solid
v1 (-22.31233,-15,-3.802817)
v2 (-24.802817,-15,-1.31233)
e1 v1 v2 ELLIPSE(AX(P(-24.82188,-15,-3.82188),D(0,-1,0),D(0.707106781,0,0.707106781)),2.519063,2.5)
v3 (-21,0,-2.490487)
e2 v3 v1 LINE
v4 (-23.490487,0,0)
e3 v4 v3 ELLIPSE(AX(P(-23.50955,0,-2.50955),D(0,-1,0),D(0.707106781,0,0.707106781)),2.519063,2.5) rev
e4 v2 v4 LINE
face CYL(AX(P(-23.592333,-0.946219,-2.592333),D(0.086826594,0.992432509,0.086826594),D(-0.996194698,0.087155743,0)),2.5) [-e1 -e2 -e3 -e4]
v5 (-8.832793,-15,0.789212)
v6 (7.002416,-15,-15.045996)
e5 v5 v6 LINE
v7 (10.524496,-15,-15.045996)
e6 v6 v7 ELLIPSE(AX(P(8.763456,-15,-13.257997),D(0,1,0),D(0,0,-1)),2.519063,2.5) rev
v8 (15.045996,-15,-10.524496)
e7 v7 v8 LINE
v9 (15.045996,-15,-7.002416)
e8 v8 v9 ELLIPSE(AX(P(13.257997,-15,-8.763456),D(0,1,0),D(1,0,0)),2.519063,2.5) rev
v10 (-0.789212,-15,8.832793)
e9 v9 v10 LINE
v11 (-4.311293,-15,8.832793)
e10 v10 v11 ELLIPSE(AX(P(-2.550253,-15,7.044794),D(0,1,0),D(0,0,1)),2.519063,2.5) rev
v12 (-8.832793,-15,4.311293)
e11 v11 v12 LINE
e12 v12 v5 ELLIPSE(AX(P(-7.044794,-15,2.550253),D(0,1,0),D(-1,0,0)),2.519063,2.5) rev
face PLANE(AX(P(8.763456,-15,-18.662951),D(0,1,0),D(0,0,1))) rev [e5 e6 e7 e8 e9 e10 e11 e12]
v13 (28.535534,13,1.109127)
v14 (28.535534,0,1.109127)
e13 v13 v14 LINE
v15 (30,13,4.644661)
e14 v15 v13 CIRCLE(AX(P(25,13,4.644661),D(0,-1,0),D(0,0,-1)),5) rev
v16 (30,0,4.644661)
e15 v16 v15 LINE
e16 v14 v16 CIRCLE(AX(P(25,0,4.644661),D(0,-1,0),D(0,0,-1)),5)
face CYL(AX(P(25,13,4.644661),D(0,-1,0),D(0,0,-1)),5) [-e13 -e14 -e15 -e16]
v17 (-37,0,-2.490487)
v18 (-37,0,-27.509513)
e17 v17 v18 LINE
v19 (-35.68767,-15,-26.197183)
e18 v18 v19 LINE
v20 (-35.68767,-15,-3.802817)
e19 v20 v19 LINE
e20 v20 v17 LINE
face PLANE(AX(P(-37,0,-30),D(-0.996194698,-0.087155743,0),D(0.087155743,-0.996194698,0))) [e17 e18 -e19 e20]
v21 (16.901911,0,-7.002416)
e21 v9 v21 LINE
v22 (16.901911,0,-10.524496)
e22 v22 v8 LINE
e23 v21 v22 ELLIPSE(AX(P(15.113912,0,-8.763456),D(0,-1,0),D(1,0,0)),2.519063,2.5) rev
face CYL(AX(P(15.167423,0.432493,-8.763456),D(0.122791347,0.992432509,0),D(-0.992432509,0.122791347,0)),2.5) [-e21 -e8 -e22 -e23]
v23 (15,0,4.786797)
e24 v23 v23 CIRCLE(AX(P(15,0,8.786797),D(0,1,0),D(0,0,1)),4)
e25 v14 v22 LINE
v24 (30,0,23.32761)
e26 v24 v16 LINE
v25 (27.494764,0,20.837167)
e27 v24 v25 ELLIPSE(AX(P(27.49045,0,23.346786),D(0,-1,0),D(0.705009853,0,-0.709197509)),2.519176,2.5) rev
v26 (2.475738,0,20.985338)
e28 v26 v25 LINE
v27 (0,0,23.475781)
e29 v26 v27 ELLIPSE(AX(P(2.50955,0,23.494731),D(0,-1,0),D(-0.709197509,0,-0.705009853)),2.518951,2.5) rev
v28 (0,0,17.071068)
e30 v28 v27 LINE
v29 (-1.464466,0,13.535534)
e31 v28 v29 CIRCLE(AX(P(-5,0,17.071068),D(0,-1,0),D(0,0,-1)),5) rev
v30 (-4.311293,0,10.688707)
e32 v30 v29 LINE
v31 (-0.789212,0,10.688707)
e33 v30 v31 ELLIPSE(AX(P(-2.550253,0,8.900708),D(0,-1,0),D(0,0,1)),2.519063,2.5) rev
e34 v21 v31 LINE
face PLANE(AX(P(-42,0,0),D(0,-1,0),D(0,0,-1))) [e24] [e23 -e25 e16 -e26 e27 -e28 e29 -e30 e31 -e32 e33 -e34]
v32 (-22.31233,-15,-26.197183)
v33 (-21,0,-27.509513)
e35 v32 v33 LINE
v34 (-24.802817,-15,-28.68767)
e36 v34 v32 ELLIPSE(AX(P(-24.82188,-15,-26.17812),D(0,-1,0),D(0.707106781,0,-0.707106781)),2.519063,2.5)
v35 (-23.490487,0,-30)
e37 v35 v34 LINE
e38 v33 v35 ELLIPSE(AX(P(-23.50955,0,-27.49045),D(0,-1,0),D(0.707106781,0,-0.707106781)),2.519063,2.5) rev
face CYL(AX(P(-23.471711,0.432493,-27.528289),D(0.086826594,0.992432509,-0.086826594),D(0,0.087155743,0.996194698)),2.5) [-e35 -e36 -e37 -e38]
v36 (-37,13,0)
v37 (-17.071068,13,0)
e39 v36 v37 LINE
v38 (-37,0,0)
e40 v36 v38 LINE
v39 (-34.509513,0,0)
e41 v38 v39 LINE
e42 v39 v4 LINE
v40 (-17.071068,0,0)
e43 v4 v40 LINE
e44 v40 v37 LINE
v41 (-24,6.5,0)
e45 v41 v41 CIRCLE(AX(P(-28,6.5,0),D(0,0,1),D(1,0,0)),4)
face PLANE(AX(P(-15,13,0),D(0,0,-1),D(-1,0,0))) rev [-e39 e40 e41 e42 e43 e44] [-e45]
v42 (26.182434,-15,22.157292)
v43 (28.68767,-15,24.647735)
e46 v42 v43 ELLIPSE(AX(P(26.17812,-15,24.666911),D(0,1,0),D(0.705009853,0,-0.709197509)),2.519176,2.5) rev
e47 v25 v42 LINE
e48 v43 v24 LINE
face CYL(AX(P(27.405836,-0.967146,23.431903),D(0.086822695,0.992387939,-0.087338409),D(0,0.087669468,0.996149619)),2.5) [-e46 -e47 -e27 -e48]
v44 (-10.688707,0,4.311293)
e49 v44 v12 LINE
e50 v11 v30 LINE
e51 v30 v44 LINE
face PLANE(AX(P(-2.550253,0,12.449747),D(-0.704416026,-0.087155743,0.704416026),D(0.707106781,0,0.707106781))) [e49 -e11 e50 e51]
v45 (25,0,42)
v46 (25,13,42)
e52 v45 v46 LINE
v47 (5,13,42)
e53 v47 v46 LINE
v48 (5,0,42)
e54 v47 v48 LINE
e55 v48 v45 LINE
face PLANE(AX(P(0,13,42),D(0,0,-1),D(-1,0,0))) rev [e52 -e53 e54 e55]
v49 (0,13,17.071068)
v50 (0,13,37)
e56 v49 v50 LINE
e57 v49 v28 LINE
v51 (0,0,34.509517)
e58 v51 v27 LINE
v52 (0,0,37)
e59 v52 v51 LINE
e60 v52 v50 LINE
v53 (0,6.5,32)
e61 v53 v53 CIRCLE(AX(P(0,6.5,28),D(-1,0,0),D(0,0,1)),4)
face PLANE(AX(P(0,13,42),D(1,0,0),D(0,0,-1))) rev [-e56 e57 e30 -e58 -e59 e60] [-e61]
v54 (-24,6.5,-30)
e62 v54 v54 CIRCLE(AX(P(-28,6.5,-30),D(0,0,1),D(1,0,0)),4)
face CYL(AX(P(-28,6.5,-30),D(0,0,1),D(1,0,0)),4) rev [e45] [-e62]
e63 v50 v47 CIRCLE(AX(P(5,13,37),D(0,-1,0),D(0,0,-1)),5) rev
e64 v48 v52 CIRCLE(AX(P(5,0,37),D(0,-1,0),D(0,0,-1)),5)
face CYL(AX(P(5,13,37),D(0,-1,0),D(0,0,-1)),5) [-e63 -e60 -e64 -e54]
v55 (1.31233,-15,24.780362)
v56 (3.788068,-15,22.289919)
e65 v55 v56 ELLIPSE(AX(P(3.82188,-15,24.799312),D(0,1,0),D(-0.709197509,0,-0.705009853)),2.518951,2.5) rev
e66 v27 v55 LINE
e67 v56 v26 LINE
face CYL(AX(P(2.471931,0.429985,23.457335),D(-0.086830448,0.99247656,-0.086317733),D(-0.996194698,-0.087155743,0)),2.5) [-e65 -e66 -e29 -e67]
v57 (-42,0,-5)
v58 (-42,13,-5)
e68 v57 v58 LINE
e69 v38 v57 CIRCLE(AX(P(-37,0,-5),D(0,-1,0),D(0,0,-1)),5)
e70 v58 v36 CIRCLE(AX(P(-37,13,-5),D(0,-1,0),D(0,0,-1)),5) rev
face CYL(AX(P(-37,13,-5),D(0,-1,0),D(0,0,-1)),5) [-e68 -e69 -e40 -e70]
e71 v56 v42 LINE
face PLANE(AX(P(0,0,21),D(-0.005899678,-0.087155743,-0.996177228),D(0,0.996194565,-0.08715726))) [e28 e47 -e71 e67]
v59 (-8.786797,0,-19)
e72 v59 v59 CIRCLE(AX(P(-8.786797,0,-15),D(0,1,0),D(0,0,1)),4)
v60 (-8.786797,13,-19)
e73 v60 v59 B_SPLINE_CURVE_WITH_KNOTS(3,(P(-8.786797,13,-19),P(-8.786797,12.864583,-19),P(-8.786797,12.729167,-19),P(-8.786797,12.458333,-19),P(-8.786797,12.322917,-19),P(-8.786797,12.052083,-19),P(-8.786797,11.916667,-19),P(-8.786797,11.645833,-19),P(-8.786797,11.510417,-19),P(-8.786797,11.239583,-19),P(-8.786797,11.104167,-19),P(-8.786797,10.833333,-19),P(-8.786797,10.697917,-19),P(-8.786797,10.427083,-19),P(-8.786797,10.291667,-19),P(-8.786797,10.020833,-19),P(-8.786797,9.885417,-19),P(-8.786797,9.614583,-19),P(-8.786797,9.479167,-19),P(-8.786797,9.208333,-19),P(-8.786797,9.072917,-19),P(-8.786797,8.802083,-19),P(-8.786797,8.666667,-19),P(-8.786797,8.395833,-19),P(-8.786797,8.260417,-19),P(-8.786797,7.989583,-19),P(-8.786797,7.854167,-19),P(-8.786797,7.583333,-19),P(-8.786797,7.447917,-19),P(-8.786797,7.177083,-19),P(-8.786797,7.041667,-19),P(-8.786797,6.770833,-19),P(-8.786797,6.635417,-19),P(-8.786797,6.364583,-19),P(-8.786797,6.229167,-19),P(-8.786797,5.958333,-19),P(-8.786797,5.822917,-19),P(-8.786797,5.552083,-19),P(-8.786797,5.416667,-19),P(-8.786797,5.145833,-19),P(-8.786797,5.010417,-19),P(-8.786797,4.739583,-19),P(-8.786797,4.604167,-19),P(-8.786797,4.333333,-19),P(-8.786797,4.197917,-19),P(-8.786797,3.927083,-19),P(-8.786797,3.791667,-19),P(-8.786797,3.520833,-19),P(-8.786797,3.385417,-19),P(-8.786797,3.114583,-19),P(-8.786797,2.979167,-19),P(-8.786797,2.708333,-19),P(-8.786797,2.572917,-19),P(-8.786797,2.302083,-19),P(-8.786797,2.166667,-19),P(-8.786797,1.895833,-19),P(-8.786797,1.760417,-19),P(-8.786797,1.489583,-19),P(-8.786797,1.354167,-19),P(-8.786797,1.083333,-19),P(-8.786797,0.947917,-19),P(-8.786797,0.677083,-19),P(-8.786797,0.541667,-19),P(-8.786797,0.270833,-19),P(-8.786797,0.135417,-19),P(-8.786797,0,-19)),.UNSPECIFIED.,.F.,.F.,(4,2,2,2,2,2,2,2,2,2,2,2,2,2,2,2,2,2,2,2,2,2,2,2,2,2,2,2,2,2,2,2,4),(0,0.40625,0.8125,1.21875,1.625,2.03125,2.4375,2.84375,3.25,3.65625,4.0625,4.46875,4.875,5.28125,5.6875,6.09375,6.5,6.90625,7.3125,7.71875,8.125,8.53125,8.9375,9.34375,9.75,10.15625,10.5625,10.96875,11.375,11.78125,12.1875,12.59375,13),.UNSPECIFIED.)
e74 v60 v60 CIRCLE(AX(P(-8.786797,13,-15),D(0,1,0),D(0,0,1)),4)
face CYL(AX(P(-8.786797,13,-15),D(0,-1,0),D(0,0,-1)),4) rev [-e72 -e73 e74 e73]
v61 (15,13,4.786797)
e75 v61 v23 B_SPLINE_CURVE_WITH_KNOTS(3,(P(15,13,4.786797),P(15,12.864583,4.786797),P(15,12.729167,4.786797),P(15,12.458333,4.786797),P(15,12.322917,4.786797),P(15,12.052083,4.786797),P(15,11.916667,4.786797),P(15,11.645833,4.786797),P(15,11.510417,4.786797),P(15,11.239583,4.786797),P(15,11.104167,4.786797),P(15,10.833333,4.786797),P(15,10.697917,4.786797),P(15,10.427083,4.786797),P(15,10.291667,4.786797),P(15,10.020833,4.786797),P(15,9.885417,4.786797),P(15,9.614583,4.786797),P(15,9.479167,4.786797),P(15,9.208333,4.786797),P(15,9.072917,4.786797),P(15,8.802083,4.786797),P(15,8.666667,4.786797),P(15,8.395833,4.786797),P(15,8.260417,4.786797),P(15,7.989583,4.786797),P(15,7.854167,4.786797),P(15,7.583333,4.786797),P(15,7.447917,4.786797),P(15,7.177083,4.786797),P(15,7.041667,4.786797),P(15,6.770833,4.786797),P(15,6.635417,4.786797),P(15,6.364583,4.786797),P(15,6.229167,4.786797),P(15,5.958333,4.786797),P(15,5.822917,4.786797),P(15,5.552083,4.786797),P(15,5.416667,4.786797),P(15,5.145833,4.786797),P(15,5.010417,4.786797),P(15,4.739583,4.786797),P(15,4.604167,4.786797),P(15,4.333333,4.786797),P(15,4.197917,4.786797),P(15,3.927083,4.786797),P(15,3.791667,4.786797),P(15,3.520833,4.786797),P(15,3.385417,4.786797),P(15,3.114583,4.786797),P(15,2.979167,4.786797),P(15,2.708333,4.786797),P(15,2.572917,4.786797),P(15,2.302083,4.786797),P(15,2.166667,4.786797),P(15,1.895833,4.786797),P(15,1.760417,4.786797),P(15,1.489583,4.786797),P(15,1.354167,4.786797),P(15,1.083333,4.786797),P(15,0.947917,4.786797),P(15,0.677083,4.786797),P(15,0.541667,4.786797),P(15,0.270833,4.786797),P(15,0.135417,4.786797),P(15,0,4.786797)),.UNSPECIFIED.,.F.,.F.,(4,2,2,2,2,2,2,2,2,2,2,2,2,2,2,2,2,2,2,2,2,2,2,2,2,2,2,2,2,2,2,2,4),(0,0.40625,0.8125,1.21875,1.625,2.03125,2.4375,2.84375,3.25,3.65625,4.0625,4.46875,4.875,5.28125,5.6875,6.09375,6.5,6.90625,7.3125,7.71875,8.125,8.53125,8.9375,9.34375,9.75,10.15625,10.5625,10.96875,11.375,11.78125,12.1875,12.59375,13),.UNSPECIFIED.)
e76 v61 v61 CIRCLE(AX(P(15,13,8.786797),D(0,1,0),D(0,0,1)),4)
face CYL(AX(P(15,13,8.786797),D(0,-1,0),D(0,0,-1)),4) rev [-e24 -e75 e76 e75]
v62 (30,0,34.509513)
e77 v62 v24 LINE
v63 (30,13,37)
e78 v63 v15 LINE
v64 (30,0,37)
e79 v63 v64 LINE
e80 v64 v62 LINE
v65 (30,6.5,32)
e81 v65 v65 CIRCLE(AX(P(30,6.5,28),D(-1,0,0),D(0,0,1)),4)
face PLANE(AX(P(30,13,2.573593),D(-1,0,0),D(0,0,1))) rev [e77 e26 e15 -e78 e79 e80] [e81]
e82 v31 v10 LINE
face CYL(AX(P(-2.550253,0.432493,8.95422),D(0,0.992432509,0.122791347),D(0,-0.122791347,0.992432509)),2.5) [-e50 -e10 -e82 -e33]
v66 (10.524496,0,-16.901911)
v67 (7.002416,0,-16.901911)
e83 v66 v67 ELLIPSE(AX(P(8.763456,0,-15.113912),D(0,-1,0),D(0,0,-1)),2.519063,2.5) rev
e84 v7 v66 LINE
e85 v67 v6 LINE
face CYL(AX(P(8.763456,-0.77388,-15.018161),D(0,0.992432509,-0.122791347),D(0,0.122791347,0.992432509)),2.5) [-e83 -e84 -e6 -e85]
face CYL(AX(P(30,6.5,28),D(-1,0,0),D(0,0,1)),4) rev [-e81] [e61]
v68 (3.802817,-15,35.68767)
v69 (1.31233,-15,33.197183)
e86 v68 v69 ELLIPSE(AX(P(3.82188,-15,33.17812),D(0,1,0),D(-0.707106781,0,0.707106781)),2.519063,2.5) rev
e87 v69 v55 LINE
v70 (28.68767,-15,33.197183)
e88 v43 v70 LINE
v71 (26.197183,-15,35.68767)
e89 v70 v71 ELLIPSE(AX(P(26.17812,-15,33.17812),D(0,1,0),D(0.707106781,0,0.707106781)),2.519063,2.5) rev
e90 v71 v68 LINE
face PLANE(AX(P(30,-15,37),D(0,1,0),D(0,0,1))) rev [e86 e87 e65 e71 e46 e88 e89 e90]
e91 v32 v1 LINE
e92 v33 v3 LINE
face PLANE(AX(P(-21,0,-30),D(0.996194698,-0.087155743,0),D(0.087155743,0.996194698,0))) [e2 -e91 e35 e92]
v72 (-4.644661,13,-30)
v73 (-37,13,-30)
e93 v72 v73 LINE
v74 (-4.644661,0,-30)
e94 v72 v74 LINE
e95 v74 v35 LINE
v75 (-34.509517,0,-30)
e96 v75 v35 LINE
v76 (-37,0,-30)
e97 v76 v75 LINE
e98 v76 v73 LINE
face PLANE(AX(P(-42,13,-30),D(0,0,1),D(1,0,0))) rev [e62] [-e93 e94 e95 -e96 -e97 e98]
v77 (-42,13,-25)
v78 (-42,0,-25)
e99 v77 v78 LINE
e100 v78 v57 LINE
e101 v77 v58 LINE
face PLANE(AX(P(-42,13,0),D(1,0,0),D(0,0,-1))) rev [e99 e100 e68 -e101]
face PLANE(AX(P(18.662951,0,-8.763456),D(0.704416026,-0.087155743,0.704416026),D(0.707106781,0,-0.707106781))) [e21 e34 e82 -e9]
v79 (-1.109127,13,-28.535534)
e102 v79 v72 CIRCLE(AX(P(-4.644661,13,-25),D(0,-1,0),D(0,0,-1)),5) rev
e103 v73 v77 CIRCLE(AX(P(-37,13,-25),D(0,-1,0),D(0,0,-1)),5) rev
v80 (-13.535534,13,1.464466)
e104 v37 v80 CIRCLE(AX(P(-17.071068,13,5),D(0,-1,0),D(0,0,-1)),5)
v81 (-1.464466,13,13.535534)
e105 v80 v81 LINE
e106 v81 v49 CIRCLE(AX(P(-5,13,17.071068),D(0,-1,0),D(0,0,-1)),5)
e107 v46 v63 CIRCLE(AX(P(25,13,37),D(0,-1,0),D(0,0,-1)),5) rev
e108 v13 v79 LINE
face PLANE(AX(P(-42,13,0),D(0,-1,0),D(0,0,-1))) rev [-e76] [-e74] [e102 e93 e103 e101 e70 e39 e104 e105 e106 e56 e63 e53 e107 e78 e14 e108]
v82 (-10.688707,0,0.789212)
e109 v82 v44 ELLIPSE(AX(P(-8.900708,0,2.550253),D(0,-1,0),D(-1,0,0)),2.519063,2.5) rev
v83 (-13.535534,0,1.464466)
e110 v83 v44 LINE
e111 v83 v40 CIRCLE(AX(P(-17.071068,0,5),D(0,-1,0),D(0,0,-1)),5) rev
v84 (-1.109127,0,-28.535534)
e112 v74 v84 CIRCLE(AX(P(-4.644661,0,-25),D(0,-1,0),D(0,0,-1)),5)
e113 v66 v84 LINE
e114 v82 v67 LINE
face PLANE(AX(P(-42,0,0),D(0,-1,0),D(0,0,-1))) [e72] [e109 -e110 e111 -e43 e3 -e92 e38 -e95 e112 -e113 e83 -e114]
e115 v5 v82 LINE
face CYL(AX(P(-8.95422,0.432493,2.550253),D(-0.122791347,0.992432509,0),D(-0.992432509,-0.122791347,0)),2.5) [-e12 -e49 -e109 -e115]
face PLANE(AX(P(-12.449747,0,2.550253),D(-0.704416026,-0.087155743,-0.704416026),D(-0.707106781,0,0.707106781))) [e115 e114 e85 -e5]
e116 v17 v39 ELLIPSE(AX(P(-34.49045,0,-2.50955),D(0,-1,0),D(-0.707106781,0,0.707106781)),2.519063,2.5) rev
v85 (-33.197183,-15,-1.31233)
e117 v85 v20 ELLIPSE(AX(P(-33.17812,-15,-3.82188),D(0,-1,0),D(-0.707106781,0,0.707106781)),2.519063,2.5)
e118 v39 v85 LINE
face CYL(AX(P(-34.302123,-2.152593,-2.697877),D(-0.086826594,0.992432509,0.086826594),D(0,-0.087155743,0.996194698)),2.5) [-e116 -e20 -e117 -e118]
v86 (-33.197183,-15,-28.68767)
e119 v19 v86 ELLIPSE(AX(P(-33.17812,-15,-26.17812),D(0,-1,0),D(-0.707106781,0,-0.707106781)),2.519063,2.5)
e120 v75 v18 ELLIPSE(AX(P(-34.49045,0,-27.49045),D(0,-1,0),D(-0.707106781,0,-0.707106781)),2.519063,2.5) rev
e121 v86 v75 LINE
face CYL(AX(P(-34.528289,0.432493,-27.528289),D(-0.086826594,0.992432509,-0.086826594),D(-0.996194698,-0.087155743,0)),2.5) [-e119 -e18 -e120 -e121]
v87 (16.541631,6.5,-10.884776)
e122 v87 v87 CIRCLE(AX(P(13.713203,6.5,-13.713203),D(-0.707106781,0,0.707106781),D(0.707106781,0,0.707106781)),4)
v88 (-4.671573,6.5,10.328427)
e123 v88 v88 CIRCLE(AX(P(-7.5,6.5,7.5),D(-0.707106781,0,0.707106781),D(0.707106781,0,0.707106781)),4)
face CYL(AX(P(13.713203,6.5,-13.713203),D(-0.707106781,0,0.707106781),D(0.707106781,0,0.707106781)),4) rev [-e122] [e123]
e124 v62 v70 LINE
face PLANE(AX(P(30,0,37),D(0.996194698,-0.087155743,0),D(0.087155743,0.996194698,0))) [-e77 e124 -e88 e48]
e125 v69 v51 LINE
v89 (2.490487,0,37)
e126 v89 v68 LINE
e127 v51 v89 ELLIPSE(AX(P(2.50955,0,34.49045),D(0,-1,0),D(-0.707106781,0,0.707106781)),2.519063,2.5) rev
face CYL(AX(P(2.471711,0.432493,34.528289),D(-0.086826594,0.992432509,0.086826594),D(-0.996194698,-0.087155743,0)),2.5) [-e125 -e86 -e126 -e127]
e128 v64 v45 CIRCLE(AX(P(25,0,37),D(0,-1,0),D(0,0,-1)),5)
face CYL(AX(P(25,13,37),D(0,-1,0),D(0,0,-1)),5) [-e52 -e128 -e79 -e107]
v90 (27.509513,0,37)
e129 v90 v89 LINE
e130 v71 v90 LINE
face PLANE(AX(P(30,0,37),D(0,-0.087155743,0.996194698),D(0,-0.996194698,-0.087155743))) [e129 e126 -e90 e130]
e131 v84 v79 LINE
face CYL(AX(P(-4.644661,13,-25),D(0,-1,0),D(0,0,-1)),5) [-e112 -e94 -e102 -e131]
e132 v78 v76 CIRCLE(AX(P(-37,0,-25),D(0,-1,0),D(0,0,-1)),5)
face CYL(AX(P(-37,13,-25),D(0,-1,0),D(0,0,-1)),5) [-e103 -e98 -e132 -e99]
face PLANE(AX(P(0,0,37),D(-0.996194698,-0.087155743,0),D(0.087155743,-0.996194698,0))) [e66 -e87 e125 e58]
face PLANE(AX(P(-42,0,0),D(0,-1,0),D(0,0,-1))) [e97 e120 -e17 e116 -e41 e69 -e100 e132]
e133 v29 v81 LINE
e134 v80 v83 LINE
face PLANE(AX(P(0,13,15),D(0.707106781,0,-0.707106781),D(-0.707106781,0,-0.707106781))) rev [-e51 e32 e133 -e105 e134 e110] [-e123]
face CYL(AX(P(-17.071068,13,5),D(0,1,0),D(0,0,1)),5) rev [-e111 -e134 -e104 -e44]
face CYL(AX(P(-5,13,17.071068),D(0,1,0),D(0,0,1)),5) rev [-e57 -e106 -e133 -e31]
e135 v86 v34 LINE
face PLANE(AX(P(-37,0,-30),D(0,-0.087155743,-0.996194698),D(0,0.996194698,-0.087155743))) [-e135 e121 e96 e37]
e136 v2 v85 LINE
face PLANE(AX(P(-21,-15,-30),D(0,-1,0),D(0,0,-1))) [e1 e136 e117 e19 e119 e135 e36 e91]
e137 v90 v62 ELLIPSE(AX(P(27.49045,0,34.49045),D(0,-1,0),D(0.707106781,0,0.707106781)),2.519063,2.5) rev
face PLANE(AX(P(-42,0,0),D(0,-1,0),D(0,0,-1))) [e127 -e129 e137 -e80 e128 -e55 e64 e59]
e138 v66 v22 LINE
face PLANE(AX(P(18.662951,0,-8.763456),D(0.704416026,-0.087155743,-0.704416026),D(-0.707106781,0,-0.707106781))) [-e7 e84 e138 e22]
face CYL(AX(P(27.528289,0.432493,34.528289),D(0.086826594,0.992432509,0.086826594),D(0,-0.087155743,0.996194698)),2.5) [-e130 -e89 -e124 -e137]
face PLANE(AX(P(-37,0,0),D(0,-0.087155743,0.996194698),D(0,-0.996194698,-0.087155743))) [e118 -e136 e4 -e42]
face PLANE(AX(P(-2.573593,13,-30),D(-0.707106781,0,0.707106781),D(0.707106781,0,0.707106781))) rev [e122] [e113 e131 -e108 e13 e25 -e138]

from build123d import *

# Parameters (mm, degrees)
SKETCH1_R                = 4
EXTRUDE1_DEPTH           = 13
FILLET5_R                = 5
SKETCH5_R                = 4
EXTRUDE5_DEPTH           = 30
SKETCH6_R                = 4
EXTRUDE6_DEPTH           = 30
SKETCH8_R                = 4
EXTRUDE7_DEPTH           = 30
SKETCH9_W                = 16
SKETCH9_H                = 30
EXTRUDE8_DEPTH           = 15
EXTRUDE8_DRAFT           = 5
EXTRUDE8_PROFILE_2_DEPTH = 15
EXTRUDE8_PROFILE_2_DRAFT = 5
EXTRUDE8_PROFILE_3_DEPTH = 15
EXTRUDE8_PROFILE_3_DRAFT = 5
FILLET8_R                = 2.5


with BuildPart() as part:
    # Sketch1 → Extrude1 (new body)
    with BuildSketch(Plane(origin=(0, 0, 0), x_dir=(1, 0, 0), z_dir=(0, 1, 0))):
        Polygon((0, -15), (-15, 0), (-42, 0), (-42, 30), (-2.573593129, 30), (30, -2.573593129), (30, -42), (0, -42), align=None)
        with Locations(Location((-8.786796564, 15, 0), (0, 0, 90))):
            Circle(SKETCH1_R, mode=Mode.SUBTRACT)
        with Locations(Location((15, -8.786796564, 0), (0, 0, 90))):
            Circle(SKETCH1_R, mode=Mode.SUBTRACT)
    extrude(amount=EXTRUDE1_DEPTH)

    # Fillet5
    fillet5_edges = [part.edges().sort_by_distance(p)[0] for p in [
        (-42, 6.5, 0),
        (-42, 6.5, -30),
        (-2.573593129, 6.5, -30),
        (30, 6.5, 2.573593129),
        (30, 6.5, 42),
        (0, 6.5, 42),
        (0, 6.5, 15),
        (-15, 6.5, 0),
    ]]
    fillet(fillet5_edges, radius=FILLET5_R)

    # Sketch5 → Extrude5 (cut)
    with BuildSketch(Plane(origin=(-7.5, 0, 7.5), x_dir=(0.7071067811865476, 0, 0.7071067811865476), z_dir=(-0.7071067811865476, 0, 0.7071067811865476))):
        with Locations((0, 6.5)):
            Circle(SKETCH5_R)
    extrude(amount=-EXTRUDE5_DEPTH, mode=Mode.SUBTRACT)

    # Sketch6 → Extrude6 (cut)
    with BuildSketch(Plane.XY):
        with Locations((-28, 6.5)):
            Circle(SKETCH6_R)
    extrude(amount=-EXTRUDE6_DEPTH, mode=Mode.SUBTRACT)

    # Sketch8 → Extrude7 (cut)
    with BuildSketch(Plane.ZY):
        with Locations((28, 6.5)):
            Circle(SKETCH8_R)
    extrude(amount=-EXTRUDE7_DEPTH, mode=Mode.SUBTRACT)


with BuildPart() as extrude8_tool:
    # Sketch9 → Extrude8 (with draft: the straight prism first)
    with BuildSketch(Plane.XZ):
        with Locations((-29, -15)):
            Rectangle(SKETCH9_W, SKETCH9_H)
    extrude(amount=EXTRUDE8_DEPTH)
    # Extrude8: the draft: its side faces are tilted about the plane it starts from
    extrude8_sides = [extrude8_tool.faces().sort_by_distance(p)[0] for p in [
        (-29, -7.5, -30),
        (-21, -7.5, -15),
        (-29, -7.5, 0),
        (-37, -7.5, -15),
    ]]
    draft(extrude8_sides, Plane.XZ, EXTRUDE8_DRAFT)


with BuildPart() as part_1:
    add(part.part)

    # Extrude8: add extrude8_tool
    add(extrude8_tool.part)


with BuildPart() as extrude8_profile_2_tool:
    # Sketch9 → Extrude8 profile 2 (with draft: the straight prism first)
    with BuildSketch(Plane.XZ):
        Polygon((18.662950904, -8.763455967), (-2.550252532, 12.449747468), (-12.449747468, 2.550252532), (8.763455967, -18.662950904), align=None)
    extrude(amount=EXTRUDE8_PROFILE_2_DEPTH)
    # Extrude8 profile 2: the draft: its side faces are tilted about the plane it starts from
    extrude8_profile_2_sides = [extrude8_profile_2_tool.faces().sort_by_distance(p)[0] for p in [
        (8.056349186, -7.5, 1.843145751),
        (-7.5, -7.5, 7.5),
        (-1.843145751, -7.5, -8.056349186),
        (13.713203436, -7.5, -13.713203436),
    ]]
    draft(extrude8_profile_2_sides, Plane.XZ, EXTRUDE8_PROFILE_2_DRAFT)


with BuildPart() as part_2:
    add(part_1.part)

    # Extrude8 profile 2: add extrude8_profile_2_tool
    add(extrude8_profile_2_tool.part)


with BuildPart() as extrude8_profile_3_tool:
    # Sketch9 → Extrude8 profile 3 (with draft: the straight prism first)
    with BuildSketch(Plane.XZ):
        Polygon((30, 37), (0, 37), (0, 21), (30, 20.82233047), align=None)
    extrude(amount=EXTRUDE8_PROFILE_3_DEPTH)
    # Extrude8 profile 3: the draft: its side faces are tilted about the plane it starts from
    extrude8_profile_3_sides = [extrude8_profile_3_tool.faces().sort_by_distance(p)[0] for p in [
        (15, -7.5, 37),
        (0, -7.5, 29),
        (15, -7.5, 20.911165235),
        (30, -7.5, 28.911165235),
    ]]
    draft(extrude8_profile_3_sides, Plane.XZ, EXTRUDE8_PROFILE_3_DRAFT)


with BuildPart() as part_3:
    add(part_2.part)

    # Extrude8 profile 3: add extrude8_profile_3_tool
    add(extrude8_profile_3_tool.part)

    # Fillet8
    # the kernel refuses this fillet: 2.5 mm, written as the material it takes off along each edge
    with BuildSketch(Plane(origin=(-13.211385745, 6.155764282, 2.550252532), x_dir=(0.6990853645605914, 0.08649619246092898, 0.7097873355780214), z_dir=(0.12279134661747972, -0.9924325091389671, 0))) as fillet8_piece_1_section:
        with BuildLine():
            CenterArc((FILLET8_R * 0.992432509139, -FILLET8_R), FILLET8_R, 90, 89.564769998)
            Line((-FILLET8_R * 0.00753863989878, -FILLET8_R * 0.992403876506), (0, 0))
            Line((0, 0), (FILLET8_R * 0.992432509139, 0))
        make_face()
    fillet8_piece_1 = extrude(amount=27.519784281, mode=Mode.PRIVATE)
    fillet8_piece_1 = split(fillet8_piece_1, bisect_by=Plane(origin=(-10.350961521, 0, 2.550252532), z_dir=(0, -1, 0)), keep=Keep.TOP, mode=Mode.PRIVATE)
    add(fillet8_piece_1, mode=Mode.SUBTRACT)
    with BuildSketch(Plane(origin=(-2.550252532, 6.155764282, 13.211385745), x_dir=(-0.7097873355780224, 0.08649619246092884, -0.6990853645605904), z_dir=(0, -0.9924325091389671, -0.12279134661747967))) as fillet8_piece_2_section:
        with BuildLine():
            CenterArc((FILLET8_R * 0.992432509139, FILLET8_R), FILLET8_R, 180.435230002, 89.564769998)
            Line((-FILLET8_R * 0.00753863989878, FILLET8_R * 0.992403876506), (0, 0))
            Line((0, 0), (FILLET8_R * 0.992432509139, 0))
        make_face()
    fillet8_piece_2 = extrude(amount=27.519784281, mode=Mode.PRIVATE)
    fillet8_piece_2 = split(fillet8_piece_2, bisect_by=Plane(origin=(-2.550252532, 0, 10.350961521), z_dir=(0, -1, 0)), keep=Keep.TOP, mode=Mode.PRIVATE)
    add(fillet8_piece_2, mode=Mode.SUBTRACT)
    with BuildSketch(Plane(origin=(-0.535427042, 6.119959098, 20.467734537), x_dir=(0.9962056349623634, 0.08598926801855533, -0.01342306428755091), z_dir=(0.0868304478214788, -0.9924765600716912, 0.08631773305285761))) as fillet8_piece_3_section:
        with BuildLine():
            CenterArc((FILLET8_R * 0.98661620345, FILLET8_R), FILLET8_R, 180.77198953, 89.22801047)
            Line((-FILLET8_R * 0.0132930268312, FILLET8_R * 0.986526648575), (0, 0))
            Line((0, 0), (FILLET8_R * 0.98661620345, 0))
        make_face()
    fillet8_piece_3 = extrude(amount=27.44640961, mode=Mode.PRIVATE)
    fillet8_piece_3 = split(fillet8_piece_3, bisect_by=Plane(origin=(1.478852111, 0, 22.470119813), z_dir=(0, -1, 0)), keep=Keep.TOP, mode=Mode.PRIVATE)
    add(fillet8_piece_3, mode=Mode.SUBTRACT)
    with BuildSketch(Plane(origin=(-0.53855959, 6.155764282, 37.53855959), x_dir=(-0.007567436278487758, 0.0864961924609277, -0.9962234400966146), z_dir=(0.08682659386424772, -0.9924325091389672, -0.08682659386424656))) as fillet8_piece_4_section:
        with BuildLine():
            CenterArc((FILLET8_R * 0.992432509139, FILLET8_R), FILLET8_R, 180.435230002, 89.564769998)
            Line((-FILLET8_R * 0.00753863989879, FILLET8_R * 0.992403876506), (0, 0))
            Line((0, 0), (FILLET8_R * 0.992432509139, 0))
        make_face()
    fillet8_piece_4 = extrude(amount=27.519784281, mode=Mode.PRIVATE)
    fillet8_piece_4 = split(fillet8_piece_4, bisect_by=Plane(origin=(1.484065776, 0, 35.515934224), z_dir=(0, -1, 0)), keep=Keep.TOP, mode=Mode.PRIVATE)
    add(fillet8_piece_4, mode=Mode.SUBTRACT)
    with BuildSketch(Plane(origin=(-37.53855959, 6.155764282, 0.53855959), x_dir=(0.9962234400966147, 0.08649619246092866, 0.00756743627848773), z_dir=(0.0868265938642475, -0.9924325091389671, -0.08682659386424771))) as fillet8_piece_5_section:
        with BuildLine():
            CenterArc((FILLET8_R * 0.992432509139, -FILLET8_R), FILLET8_R, 90, 89.564769998)
            Line((-FILLET8_R * 0.00753863989878, -FILLET8_R * 0.992403876506), (0, 0))
            Line((0, 0), (FILLET8_R * 0.992432509139, 0))
        make_face()
    fillet8_piece_5 = extrude(amount=27.519784281, mode=Mode.PRIVATE)
    fillet8_piece_5 = split(fillet8_piece_5, bisect_by=Plane(origin=(-35.515934224, 0, -1.484065776), z_dir=(0, -1, 0)), keep=Keep.TOP, mode=Mode.PRIVATE)
    add(fillet8_piece_5, mode=Mode.SUBTRACT)
    with BuildSketch(Plane(origin=(-37.53855959, 6.155764282, -30.53855959), x_dir=(0.9962234400966145, 0.08649619246092907, -0.007567436278487628), z_dir=(0.08682659386424792, -0.9924325091389671, 0.08682659386424772))) as fillet8_piece_6_section:
        with BuildLine():
            CenterArc((FILLET8_R * 0.992432509139, FILLET8_R), FILLET8_R, 180.435230002, 89.564769998)
            Line((-FILLET8_R * 0.00753863989877, FILLET8_R * 0.992403876506), (0, 0))
            Line((0, 0), (FILLET8_R * 0.992432509139, 0))
        make_face()
    fillet8_piece_6 = extrude(amount=27.519784281, mode=Mode.PRIVATE)
    fillet8_piece_6 = split(fillet8_piece_6, bisect_by=Plane(origin=(-35.515934224, 0, -28.515934224), z_dir=(0, -1, 0)), keep=Keep.TOP, mode=Mode.PRIVATE)
    add(fillet8_piece_6, mode=Mode.SUBTRACT)
    with BuildSketch(Plane(origin=(-20.46144041, 6.155764282, 0.53855959), x_dir=(0.007567436278484768, 0.08649619246092911, -0.9962234400966145), z_dir=(-0.0868265938642479, -0.9924325091389671, -0.08682659386424771))) as fillet8_piece_7_section:
        with BuildLine():
            CenterArc((FILLET8_R * 0.992432509139, -FILLET8_R), FILLET8_R, 90, 89.564769998)
            Line((-FILLET8_R * 0.00753863989877, -FILLET8_R * 0.992403876506), (0, 0))
            Line((0, 0), (FILLET8_R * 0.992432509139, 0))
        make_face()
    fillet8_piece_7 = extrude(amount=27.519784281, mode=Mode.PRIVATE)
    fillet8_piece_7 = split(fillet8_piece_7, bisect_by=Plane(origin=(-22.484065776, 0, -1.484065776), z_dir=(0, -1, 0)), keep=Keep.TOP, mode=Mode.PRIVATE)
    add(fillet8_piece_7, mode=Mode.SUBTRACT)
    with BuildSketch(Plane(origin=(8.763455967, 6.155764282, -19.42458918), x_dir=(-0.7097873355780235, 0.08649619246092868, 0.6990853645605893), z_dir=(0, -0.9924325091389671, 0.12279134661747969))) as fillet8_piece_8_section:
        with BuildLine():
            CenterArc((FILLET8_R * 0.992432509139, -FILLET8_R), FILLET8_R, 90, 89.564769998)
            Line((-FILLET8_R * 0.00753863989878, -FILLET8_R * 0.992403876506), (0, 0))
            Line((0, 0), (FILLET8_R * 0.992432509139, 0))
        make_face()
    fillet8_piece_8 = extrude(amount=27.519784281, mode=Mode.PRIVATE)
    fillet8_piece_8 = split(fillet8_piece_8, bisect_by=Plane(origin=(8.763455967, 0, -16.564164956), z_dir=(0, -1, 0)), keep=Keep.TOP, mode=Mode.PRIVATE)
    add(fillet8_piece_8, mode=Mode.SUBTRACT)
    with BuildSketch(Plane(origin=(30.53855959, 6.155764282, 37.53855959), x_dir=(0.0075674362784875545, 0.08649619246093003, -0.9962234400966146), z_dir=(-0.08682659386424771, -0.9924325091389671, -0.08682659386424886))) as fillet8_piece_9_section:
        with BuildLine():
            CenterArc((FILLET8_R * 0.992432509139, -FILLET8_R), FILLET8_R, 90, 89.564769998)
            Line((-FILLET8_R * 0.00753863989876, -FILLET8_R * 0.992403876506), (0, 0))
            Line((0, 0), (FILLET8_R * 0.992432509139, 0))
        make_face()
    fillet8_piece_9 = extrude(amount=27.519784281, mode=Mode.PRIVATE)
    fillet8_piece_9 = split(fillet8_piece_9, bisect_by=Plane(origin=(28.515934224, 0, 35.515934224), z_dir=(0, -1, 0)), keep=Keep.TOP, mode=Mode.PRIVATE)
    add(fillet8_piece_9, mode=Mode.SUBTRACT)
    with BuildSketch(Plane(origin=(30.541709896, 6.191772448, 20.277402896), x_dir=(-0.9962063107197006, 0.08700605966245174, -0.001712327146725053), z_dir=(-0.08682269450948527, -0.9923879393100855, 0.08733840867564902))) as fillet8_piece_10_section:
        with BuildLine():
            CenterArc((FILLET8_R * 0.998282579203, -FILLET8_R), FILLET8_R, 90, 89.90151449)
            Line((-FILLET8_R * 0.00171594349532, -FILLET8_R * 0.998281104438), (0, 0))
            Line((0, 0), (FILLET8_R * 0.998282579203, 0))
        make_face()
    fillet8_piece_10 = extrude(amount=27.593588969, mode=Mode.PRIVATE)
    fillet8_piece_10 = split(fillet8_piece_10, bisect_by=Plane(origin=(28.510705055, 0, 22.320471611), z_dir=(0, -1, 0)), keep=Keep.TOP, mode=Mode.PRIVATE)
    add(fillet8_piece_10, mode=Mode.SUBTRACT)
    with BuildSketch(Plane(origin=(-20.46144041, 6.155764282, -30.53855959), x_dir=(0.007567436278490545, 0.0864961924609286, 0.9962234400966147), z_dir=(-0.08682659386424751, -0.9924325091389671, 0.0868265938642477))) as fillet8_piece_11_section:
        with BuildLine():
            CenterArc((FILLET8_R * 0.992432509139, FILLET8_R), FILLET8_R, 180.435230002, 89.564769998)
            Line((-FILLET8_R * 0.00753863989878, FILLET8_R * 0.992403876506), (0, 0))
            Line((0, 0), (FILLET8_R * 0.992432509139, 0))
        make_face()
    fillet8_piece_11 = extrude(amount=27.519784281, mode=Mode.PRIVATE)
    fillet8_piece_11 = split(fillet8_piece_11, bisect_by=Plane(origin=(-22.484065776, 0, -28.515934224), z_dir=(0, -1, 0)), keep=Keep.TOP, mode=Mode.PRIVATE)
    add(fillet8_piece_11, mode=Mode.SUBTRACT)
    with BuildSketch(Plane(origin=(19.42458918, 6.155764282, -8.763455967), x_dir=(-0.6990853645605911, 0.08649619246092893, 0.7097873355780219), z_dir=(-0.1227913466174797, -0.9924325091389671, 0))) as fillet8_piece_12_section:
        with BuildLine():
            CenterArc((FILLET8_R * 0.992432509139, FILLET8_R), FILLET8_R, 180.435230002, 89.564769998)
            Line((-FILLET8_R * 0.00753863989878, FILLET8_R * 0.992403876506), (0, 0))
            Line((0, 0), (FILLET8_R * 0.992432509139, 0))
        make_face()
    fillet8_piece_12 = extrude(amount=27.519784281, mode=Mode.PRIVATE)
    fillet8_piece_12 = split(fillet8_piece_12, bisect_by=Plane(origin=(16.564164956, 0, -8.763455967), z_dir=(0, -1, 0)), keep=Keep.TOP, mode=Mode.PRIVATE)
    add(fillet8_piece_12, mode=Mode.SUBTRACT)


solid = part_3.part
